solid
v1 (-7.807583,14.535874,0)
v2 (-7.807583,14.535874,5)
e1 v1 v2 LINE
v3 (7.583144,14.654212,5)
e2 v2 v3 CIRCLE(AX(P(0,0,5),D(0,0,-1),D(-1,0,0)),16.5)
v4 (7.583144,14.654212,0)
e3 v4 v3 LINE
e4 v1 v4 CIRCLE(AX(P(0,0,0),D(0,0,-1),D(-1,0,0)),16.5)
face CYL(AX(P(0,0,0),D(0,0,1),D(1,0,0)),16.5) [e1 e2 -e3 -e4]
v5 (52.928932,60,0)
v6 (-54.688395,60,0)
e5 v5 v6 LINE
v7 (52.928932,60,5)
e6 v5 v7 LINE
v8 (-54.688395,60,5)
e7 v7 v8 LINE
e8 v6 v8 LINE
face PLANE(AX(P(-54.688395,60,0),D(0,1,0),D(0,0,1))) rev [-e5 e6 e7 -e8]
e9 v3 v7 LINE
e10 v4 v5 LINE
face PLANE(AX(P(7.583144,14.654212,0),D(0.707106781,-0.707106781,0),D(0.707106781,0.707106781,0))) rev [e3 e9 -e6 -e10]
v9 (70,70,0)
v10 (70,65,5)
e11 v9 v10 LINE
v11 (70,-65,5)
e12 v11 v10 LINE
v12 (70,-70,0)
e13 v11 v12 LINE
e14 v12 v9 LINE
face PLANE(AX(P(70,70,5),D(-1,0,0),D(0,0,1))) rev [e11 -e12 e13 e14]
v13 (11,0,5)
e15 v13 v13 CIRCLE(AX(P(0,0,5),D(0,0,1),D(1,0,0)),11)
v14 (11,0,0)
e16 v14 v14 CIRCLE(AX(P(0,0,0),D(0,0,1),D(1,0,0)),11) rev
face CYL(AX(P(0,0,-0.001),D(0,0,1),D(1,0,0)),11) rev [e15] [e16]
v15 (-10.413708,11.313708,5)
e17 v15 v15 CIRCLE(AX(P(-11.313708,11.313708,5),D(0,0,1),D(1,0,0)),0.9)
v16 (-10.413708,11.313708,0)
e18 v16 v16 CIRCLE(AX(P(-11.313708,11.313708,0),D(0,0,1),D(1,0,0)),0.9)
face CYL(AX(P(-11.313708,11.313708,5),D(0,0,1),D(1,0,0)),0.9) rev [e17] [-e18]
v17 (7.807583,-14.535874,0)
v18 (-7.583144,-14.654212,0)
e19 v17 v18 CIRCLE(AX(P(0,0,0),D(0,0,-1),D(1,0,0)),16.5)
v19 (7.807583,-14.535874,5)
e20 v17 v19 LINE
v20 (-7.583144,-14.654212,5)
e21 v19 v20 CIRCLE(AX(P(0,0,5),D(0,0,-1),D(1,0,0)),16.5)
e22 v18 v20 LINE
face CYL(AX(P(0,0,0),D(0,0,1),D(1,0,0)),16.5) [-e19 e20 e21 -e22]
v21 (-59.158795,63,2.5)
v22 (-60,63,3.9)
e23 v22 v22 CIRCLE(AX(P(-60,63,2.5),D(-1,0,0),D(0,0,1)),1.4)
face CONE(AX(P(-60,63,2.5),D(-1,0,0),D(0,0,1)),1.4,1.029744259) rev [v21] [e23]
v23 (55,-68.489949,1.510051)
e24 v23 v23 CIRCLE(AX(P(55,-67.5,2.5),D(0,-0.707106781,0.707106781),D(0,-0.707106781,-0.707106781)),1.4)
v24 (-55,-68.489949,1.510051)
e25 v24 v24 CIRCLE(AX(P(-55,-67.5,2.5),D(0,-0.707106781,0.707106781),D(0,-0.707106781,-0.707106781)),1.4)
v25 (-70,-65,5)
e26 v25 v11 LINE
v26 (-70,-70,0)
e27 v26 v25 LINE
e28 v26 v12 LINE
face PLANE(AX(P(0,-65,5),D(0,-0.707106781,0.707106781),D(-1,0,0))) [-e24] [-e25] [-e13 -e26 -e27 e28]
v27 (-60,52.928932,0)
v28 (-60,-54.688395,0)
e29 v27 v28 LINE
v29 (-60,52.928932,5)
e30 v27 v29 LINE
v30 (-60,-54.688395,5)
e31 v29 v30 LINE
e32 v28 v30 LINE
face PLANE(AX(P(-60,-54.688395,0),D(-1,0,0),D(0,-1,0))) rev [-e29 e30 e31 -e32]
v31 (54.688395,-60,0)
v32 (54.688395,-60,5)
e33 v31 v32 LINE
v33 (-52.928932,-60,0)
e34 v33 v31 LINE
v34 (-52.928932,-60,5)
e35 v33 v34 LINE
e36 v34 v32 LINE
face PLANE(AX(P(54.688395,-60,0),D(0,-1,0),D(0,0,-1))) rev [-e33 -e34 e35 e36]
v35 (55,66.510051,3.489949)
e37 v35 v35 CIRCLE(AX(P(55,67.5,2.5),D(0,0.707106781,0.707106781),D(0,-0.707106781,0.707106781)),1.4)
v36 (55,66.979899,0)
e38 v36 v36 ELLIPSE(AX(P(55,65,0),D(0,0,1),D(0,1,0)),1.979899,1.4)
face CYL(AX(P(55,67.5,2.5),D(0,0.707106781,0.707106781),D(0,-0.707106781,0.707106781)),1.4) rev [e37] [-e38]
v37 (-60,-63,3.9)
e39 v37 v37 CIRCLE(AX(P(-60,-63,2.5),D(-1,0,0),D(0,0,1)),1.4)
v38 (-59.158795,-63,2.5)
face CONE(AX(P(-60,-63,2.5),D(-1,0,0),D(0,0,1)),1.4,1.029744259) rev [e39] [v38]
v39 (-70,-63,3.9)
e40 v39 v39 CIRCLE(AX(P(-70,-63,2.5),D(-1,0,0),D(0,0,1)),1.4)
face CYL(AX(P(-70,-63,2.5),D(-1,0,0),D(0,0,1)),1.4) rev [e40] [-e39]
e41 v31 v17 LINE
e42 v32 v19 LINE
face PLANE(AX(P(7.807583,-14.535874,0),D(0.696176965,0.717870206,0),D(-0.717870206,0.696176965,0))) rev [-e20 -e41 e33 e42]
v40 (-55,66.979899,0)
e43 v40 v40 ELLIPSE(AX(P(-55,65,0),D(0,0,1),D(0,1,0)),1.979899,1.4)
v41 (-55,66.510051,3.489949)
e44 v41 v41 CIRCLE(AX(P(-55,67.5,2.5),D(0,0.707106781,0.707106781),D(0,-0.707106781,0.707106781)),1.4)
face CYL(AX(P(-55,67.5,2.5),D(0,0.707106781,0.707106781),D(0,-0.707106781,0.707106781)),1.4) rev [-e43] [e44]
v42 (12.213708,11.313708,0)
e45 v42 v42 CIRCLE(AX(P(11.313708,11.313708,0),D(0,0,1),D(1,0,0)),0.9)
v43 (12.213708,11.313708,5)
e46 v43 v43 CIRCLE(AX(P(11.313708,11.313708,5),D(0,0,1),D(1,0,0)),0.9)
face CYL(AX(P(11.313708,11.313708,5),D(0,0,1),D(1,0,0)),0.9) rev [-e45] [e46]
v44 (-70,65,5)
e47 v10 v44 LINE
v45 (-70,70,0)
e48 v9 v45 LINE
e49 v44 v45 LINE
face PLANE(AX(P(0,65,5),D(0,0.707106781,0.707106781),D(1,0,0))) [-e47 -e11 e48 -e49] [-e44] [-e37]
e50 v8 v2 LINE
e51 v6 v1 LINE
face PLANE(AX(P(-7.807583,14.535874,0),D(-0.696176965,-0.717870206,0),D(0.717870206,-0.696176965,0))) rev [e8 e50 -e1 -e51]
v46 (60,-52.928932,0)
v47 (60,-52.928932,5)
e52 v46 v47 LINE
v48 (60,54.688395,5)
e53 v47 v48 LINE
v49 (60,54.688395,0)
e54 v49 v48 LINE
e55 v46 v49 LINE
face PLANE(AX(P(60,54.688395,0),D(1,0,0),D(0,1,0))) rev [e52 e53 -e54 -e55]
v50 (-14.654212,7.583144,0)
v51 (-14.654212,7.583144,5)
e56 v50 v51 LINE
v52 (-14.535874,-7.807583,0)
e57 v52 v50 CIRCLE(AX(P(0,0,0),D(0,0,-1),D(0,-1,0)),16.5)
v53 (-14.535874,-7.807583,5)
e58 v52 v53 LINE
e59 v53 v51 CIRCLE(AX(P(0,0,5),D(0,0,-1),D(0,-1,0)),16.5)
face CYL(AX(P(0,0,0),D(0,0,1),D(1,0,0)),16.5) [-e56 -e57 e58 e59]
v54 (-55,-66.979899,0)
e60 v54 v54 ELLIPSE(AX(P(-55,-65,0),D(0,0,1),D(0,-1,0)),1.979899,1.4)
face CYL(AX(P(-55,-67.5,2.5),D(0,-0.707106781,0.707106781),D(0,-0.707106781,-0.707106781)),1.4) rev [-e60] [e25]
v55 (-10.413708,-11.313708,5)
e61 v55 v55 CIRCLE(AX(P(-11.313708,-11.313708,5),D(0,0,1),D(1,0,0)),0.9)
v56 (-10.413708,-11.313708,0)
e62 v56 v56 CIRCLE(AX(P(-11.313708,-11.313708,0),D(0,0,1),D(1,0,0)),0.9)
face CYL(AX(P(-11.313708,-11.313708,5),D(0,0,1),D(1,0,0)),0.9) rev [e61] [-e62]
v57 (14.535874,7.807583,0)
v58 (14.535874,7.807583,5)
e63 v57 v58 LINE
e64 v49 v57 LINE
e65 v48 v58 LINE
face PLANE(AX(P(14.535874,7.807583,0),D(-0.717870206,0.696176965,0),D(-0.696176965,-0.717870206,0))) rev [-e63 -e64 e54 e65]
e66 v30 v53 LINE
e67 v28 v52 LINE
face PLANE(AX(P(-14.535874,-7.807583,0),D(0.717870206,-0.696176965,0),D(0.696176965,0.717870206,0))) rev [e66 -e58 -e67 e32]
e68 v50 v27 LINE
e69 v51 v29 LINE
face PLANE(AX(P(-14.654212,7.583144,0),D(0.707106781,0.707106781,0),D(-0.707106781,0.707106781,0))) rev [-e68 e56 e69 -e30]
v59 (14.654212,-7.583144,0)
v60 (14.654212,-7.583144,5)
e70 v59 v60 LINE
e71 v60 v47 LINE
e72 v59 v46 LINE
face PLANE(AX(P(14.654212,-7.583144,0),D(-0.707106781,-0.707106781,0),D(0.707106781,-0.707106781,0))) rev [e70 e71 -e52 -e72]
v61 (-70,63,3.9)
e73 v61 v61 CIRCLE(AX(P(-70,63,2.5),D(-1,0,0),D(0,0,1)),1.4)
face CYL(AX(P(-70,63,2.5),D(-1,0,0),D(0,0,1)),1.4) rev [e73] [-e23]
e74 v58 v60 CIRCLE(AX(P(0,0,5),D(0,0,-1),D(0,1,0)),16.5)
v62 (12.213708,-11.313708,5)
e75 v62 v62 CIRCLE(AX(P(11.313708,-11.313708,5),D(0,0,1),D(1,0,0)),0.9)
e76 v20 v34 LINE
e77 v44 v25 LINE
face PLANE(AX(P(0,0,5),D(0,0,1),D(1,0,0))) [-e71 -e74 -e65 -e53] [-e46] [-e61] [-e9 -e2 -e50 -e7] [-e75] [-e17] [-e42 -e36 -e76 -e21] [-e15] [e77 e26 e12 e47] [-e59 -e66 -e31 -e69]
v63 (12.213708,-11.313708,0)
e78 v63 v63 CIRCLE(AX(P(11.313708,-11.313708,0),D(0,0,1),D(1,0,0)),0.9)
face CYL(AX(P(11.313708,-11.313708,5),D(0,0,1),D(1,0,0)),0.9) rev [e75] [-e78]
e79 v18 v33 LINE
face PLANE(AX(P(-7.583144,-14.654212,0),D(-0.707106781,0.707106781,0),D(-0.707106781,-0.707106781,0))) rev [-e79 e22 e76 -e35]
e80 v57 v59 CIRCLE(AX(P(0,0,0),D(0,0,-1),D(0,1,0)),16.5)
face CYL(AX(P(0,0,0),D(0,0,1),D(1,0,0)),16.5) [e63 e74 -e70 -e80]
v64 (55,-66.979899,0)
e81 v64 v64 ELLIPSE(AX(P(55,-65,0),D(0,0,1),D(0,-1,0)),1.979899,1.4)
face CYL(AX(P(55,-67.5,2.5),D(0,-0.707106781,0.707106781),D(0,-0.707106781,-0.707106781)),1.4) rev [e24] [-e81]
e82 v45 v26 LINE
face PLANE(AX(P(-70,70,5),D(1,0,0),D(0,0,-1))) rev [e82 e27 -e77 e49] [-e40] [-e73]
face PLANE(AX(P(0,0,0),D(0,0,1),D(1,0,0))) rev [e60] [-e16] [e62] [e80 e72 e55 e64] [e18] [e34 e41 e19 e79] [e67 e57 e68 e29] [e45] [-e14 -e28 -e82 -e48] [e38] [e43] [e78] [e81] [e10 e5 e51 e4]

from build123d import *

# Parameters (mm, degrees)
SKETCH3_W                 = 140
SKETCH3_H                 = 140
BOSS_EXTRUDE1_DEPTH       = 5
CUT_EXTRUDE1_DEPTH        = 5
CIRPATTERN1_COUNT         = 4
CUT_EXTRUDE2_REACH        = 101.121
SKETCH7_R                 = 11
CIRPATTERN2_COUNT         = 4
CHAMFER1_SIZE             = 5
F_3_0MM_DOWEL_HOLE2_D     = 2.8
F_3_0MM_DOWEL_HOLE2_DEPTH = 10
MIRROR3_COPY_1_D          = 2.8
MIRROR3_COPY_1_DEPTH      = 10


with BuildPart() as part:
    # Sketch3 → Boss-Extrude1 (new body)
    with BuildSketch(Plane.XY):
        Rectangle(SKETCH3_W, SKETCH3_H)
    extrude(amount=BOSS_EXTRUDE1_DEPTH)

    # Sketch4 → Cut-Extrude1 (cut)
    with BuildSketch(Plane.XY.offset(5)):
        with BuildLine():
            Line((7.583144073, 14.654211885), (52.928932188, 60))
            Line((52.928932188, 60), (-54.688394727, 60))
            Line((-54.688394727, 60), (-7.80758307, 14.53587447))
            ThreePointArc((-7.80758307, 14.53587447), (-0.126862728, 16.499512291), (7.583144073, 14.654211885))
        make_face()
    cut_extrude1 = extrude(amount=-CUT_EXTRUDE1_DEPTH, mode=Mode.SUBTRACT)

    # CirPattern1: Cut-Extrude1 ×4 about axis
    cirpattern1_axis = Axis((0, 0, 0), (0, 0, 1))
    for i in range(1, CIRPATTERN1_COUNT):
        add(cut_extrude1.rotate(cirpattern1_axis, i * 360 / CIRPATTERN1_COUNT), mode=Mode.SUBTRACT)

    # Sketch7 → Cut-Extrude2 (cut, up to next)
    with BuildSketch(Plane.XY.offset(5), mode=Mode.PRIVATE) as cut_extrude2_sk1:
        Circle(SKETCH7_R)
    cut_extrude2_tool1 = extrude(cut_extrude2_sk1.sketch, amount=-CUT_EXTRUDE2_REACH, mode=Mode.PRIVATE) & part.part
    add(cut_extrude2_tool1.solids().sort_by_distance((0, 0, 5))[0], mode=Mode.SUBTRACT)

    # Sketch9 → Ø1.8 (1.8) Diameter Hole1 (revolve, cut)
    with BuildSketch(Plane(origin=(11.313708499, -11.313708499, 5), x_dir=(0, -1, 0), z_dir=(1, 0, 0))):
        Polygon((0, 0), (0, 6.540774557), (0.9, 6), (0.9, 0), align=None)
    f_1_8_1_8_diameter_hole1 = revolve(axis=Axis((11.313708499, -11.313708499, 11.35), (0, 0, -1)), mode=Mode.SUBTRACT)

    # CirPattern2: Ø1.8 (1.8) Diameter Hole1 ×4 about axis
    cirpattern2_axis = Axis((0, 0, 0), (0, 0, 1))
    for i in range(1, CIRPATTERN2_COUNT):
        add(f_1_8_1_8_diameter_hole1.rotate(cirpattern2_axis, i * 360 / CIRPATTERN2_COUNT), mode=Mode.SUBTRACT)

    # Chamfer1
    chamfer1_edges = [part.edges().sort_by_distance(p)[0] for p in [
        (0, 70, 5),
        (0, -70, 5),
    ]]
    chamfer(chamfer1_edges, length=CHAMFER1_SIZE - 0.0001)  # a hair under: the kernel refuses the full size

    # Sketch12 → Ø3.0mm Dowel Hole1 (revolve, cut)
    with BuildSketch(Plane(origin=(-70, 63, 2.5), x_dir=(0, 0, 1), z_dir=(0, 1, 0))):
        Polygon((0, 0), (0, 10.841204867), (1.4, 10), (1.4, 0), align=None)
    f_3_0mm_dowel_hole1 = revolve(axis=Axis((-76.35, 63, 2.5), (1, 0, 0)), mode=Mode.SUBTRACT)

    # Mirror1: Ø3.0mm Dowel Hole1 across plane
    add(f_3_0mm_dowel_hole1.mirror(Plane.ZX), mode=Mode.SUBTRACT)

    # Ø3.0mm Dowel Hole2
    with Locations(Plane(origin=(55, 67.5, 2.5), x_dir=(0, -0.707106781187, 0.707106781187), z_dir=(0, 0.707106781187, 0.707106781187))):
        with Locations((0, 0)):
            f_3_0mm_dowel_hole2 = Hole(F_3_0MM_DOWEL_HOLE2_D / 2, depth=F_3_0MM_DOWEL_HOLE2_DEPTH)

    # Mirror2: Ø3.0mm Dowel Hole2 across plane
    add(f_3_0mm_dowel_hole2.mirror(Plane(origin=(0, 0, 0), x_dir=(0, 0, 1), z_dir=(1, 0, 0))), mode=Mode.SUBTRACT)

    # Mirror3: Ø3.0mm Dowel Hole2 across plane
    add(f_3_0mm_dowel_hole2.mirror(Plane.ZX), mode=Mode.SUBTRACT)

    # Mirror3 copy 1
    with Locations(Plane(origin=(-55, -67.5, 2.5), x_dir=(0, 0.707106781187, 0.707106781187), z_dir=(0, -0.707106781187, 0.707106781187))):
        with Locations((0, 0)):
            Hole(MIRROR3_COPY_1_D / 2, depth=MIRROR3_COPY_1_DEPTH)


solid = part.part
